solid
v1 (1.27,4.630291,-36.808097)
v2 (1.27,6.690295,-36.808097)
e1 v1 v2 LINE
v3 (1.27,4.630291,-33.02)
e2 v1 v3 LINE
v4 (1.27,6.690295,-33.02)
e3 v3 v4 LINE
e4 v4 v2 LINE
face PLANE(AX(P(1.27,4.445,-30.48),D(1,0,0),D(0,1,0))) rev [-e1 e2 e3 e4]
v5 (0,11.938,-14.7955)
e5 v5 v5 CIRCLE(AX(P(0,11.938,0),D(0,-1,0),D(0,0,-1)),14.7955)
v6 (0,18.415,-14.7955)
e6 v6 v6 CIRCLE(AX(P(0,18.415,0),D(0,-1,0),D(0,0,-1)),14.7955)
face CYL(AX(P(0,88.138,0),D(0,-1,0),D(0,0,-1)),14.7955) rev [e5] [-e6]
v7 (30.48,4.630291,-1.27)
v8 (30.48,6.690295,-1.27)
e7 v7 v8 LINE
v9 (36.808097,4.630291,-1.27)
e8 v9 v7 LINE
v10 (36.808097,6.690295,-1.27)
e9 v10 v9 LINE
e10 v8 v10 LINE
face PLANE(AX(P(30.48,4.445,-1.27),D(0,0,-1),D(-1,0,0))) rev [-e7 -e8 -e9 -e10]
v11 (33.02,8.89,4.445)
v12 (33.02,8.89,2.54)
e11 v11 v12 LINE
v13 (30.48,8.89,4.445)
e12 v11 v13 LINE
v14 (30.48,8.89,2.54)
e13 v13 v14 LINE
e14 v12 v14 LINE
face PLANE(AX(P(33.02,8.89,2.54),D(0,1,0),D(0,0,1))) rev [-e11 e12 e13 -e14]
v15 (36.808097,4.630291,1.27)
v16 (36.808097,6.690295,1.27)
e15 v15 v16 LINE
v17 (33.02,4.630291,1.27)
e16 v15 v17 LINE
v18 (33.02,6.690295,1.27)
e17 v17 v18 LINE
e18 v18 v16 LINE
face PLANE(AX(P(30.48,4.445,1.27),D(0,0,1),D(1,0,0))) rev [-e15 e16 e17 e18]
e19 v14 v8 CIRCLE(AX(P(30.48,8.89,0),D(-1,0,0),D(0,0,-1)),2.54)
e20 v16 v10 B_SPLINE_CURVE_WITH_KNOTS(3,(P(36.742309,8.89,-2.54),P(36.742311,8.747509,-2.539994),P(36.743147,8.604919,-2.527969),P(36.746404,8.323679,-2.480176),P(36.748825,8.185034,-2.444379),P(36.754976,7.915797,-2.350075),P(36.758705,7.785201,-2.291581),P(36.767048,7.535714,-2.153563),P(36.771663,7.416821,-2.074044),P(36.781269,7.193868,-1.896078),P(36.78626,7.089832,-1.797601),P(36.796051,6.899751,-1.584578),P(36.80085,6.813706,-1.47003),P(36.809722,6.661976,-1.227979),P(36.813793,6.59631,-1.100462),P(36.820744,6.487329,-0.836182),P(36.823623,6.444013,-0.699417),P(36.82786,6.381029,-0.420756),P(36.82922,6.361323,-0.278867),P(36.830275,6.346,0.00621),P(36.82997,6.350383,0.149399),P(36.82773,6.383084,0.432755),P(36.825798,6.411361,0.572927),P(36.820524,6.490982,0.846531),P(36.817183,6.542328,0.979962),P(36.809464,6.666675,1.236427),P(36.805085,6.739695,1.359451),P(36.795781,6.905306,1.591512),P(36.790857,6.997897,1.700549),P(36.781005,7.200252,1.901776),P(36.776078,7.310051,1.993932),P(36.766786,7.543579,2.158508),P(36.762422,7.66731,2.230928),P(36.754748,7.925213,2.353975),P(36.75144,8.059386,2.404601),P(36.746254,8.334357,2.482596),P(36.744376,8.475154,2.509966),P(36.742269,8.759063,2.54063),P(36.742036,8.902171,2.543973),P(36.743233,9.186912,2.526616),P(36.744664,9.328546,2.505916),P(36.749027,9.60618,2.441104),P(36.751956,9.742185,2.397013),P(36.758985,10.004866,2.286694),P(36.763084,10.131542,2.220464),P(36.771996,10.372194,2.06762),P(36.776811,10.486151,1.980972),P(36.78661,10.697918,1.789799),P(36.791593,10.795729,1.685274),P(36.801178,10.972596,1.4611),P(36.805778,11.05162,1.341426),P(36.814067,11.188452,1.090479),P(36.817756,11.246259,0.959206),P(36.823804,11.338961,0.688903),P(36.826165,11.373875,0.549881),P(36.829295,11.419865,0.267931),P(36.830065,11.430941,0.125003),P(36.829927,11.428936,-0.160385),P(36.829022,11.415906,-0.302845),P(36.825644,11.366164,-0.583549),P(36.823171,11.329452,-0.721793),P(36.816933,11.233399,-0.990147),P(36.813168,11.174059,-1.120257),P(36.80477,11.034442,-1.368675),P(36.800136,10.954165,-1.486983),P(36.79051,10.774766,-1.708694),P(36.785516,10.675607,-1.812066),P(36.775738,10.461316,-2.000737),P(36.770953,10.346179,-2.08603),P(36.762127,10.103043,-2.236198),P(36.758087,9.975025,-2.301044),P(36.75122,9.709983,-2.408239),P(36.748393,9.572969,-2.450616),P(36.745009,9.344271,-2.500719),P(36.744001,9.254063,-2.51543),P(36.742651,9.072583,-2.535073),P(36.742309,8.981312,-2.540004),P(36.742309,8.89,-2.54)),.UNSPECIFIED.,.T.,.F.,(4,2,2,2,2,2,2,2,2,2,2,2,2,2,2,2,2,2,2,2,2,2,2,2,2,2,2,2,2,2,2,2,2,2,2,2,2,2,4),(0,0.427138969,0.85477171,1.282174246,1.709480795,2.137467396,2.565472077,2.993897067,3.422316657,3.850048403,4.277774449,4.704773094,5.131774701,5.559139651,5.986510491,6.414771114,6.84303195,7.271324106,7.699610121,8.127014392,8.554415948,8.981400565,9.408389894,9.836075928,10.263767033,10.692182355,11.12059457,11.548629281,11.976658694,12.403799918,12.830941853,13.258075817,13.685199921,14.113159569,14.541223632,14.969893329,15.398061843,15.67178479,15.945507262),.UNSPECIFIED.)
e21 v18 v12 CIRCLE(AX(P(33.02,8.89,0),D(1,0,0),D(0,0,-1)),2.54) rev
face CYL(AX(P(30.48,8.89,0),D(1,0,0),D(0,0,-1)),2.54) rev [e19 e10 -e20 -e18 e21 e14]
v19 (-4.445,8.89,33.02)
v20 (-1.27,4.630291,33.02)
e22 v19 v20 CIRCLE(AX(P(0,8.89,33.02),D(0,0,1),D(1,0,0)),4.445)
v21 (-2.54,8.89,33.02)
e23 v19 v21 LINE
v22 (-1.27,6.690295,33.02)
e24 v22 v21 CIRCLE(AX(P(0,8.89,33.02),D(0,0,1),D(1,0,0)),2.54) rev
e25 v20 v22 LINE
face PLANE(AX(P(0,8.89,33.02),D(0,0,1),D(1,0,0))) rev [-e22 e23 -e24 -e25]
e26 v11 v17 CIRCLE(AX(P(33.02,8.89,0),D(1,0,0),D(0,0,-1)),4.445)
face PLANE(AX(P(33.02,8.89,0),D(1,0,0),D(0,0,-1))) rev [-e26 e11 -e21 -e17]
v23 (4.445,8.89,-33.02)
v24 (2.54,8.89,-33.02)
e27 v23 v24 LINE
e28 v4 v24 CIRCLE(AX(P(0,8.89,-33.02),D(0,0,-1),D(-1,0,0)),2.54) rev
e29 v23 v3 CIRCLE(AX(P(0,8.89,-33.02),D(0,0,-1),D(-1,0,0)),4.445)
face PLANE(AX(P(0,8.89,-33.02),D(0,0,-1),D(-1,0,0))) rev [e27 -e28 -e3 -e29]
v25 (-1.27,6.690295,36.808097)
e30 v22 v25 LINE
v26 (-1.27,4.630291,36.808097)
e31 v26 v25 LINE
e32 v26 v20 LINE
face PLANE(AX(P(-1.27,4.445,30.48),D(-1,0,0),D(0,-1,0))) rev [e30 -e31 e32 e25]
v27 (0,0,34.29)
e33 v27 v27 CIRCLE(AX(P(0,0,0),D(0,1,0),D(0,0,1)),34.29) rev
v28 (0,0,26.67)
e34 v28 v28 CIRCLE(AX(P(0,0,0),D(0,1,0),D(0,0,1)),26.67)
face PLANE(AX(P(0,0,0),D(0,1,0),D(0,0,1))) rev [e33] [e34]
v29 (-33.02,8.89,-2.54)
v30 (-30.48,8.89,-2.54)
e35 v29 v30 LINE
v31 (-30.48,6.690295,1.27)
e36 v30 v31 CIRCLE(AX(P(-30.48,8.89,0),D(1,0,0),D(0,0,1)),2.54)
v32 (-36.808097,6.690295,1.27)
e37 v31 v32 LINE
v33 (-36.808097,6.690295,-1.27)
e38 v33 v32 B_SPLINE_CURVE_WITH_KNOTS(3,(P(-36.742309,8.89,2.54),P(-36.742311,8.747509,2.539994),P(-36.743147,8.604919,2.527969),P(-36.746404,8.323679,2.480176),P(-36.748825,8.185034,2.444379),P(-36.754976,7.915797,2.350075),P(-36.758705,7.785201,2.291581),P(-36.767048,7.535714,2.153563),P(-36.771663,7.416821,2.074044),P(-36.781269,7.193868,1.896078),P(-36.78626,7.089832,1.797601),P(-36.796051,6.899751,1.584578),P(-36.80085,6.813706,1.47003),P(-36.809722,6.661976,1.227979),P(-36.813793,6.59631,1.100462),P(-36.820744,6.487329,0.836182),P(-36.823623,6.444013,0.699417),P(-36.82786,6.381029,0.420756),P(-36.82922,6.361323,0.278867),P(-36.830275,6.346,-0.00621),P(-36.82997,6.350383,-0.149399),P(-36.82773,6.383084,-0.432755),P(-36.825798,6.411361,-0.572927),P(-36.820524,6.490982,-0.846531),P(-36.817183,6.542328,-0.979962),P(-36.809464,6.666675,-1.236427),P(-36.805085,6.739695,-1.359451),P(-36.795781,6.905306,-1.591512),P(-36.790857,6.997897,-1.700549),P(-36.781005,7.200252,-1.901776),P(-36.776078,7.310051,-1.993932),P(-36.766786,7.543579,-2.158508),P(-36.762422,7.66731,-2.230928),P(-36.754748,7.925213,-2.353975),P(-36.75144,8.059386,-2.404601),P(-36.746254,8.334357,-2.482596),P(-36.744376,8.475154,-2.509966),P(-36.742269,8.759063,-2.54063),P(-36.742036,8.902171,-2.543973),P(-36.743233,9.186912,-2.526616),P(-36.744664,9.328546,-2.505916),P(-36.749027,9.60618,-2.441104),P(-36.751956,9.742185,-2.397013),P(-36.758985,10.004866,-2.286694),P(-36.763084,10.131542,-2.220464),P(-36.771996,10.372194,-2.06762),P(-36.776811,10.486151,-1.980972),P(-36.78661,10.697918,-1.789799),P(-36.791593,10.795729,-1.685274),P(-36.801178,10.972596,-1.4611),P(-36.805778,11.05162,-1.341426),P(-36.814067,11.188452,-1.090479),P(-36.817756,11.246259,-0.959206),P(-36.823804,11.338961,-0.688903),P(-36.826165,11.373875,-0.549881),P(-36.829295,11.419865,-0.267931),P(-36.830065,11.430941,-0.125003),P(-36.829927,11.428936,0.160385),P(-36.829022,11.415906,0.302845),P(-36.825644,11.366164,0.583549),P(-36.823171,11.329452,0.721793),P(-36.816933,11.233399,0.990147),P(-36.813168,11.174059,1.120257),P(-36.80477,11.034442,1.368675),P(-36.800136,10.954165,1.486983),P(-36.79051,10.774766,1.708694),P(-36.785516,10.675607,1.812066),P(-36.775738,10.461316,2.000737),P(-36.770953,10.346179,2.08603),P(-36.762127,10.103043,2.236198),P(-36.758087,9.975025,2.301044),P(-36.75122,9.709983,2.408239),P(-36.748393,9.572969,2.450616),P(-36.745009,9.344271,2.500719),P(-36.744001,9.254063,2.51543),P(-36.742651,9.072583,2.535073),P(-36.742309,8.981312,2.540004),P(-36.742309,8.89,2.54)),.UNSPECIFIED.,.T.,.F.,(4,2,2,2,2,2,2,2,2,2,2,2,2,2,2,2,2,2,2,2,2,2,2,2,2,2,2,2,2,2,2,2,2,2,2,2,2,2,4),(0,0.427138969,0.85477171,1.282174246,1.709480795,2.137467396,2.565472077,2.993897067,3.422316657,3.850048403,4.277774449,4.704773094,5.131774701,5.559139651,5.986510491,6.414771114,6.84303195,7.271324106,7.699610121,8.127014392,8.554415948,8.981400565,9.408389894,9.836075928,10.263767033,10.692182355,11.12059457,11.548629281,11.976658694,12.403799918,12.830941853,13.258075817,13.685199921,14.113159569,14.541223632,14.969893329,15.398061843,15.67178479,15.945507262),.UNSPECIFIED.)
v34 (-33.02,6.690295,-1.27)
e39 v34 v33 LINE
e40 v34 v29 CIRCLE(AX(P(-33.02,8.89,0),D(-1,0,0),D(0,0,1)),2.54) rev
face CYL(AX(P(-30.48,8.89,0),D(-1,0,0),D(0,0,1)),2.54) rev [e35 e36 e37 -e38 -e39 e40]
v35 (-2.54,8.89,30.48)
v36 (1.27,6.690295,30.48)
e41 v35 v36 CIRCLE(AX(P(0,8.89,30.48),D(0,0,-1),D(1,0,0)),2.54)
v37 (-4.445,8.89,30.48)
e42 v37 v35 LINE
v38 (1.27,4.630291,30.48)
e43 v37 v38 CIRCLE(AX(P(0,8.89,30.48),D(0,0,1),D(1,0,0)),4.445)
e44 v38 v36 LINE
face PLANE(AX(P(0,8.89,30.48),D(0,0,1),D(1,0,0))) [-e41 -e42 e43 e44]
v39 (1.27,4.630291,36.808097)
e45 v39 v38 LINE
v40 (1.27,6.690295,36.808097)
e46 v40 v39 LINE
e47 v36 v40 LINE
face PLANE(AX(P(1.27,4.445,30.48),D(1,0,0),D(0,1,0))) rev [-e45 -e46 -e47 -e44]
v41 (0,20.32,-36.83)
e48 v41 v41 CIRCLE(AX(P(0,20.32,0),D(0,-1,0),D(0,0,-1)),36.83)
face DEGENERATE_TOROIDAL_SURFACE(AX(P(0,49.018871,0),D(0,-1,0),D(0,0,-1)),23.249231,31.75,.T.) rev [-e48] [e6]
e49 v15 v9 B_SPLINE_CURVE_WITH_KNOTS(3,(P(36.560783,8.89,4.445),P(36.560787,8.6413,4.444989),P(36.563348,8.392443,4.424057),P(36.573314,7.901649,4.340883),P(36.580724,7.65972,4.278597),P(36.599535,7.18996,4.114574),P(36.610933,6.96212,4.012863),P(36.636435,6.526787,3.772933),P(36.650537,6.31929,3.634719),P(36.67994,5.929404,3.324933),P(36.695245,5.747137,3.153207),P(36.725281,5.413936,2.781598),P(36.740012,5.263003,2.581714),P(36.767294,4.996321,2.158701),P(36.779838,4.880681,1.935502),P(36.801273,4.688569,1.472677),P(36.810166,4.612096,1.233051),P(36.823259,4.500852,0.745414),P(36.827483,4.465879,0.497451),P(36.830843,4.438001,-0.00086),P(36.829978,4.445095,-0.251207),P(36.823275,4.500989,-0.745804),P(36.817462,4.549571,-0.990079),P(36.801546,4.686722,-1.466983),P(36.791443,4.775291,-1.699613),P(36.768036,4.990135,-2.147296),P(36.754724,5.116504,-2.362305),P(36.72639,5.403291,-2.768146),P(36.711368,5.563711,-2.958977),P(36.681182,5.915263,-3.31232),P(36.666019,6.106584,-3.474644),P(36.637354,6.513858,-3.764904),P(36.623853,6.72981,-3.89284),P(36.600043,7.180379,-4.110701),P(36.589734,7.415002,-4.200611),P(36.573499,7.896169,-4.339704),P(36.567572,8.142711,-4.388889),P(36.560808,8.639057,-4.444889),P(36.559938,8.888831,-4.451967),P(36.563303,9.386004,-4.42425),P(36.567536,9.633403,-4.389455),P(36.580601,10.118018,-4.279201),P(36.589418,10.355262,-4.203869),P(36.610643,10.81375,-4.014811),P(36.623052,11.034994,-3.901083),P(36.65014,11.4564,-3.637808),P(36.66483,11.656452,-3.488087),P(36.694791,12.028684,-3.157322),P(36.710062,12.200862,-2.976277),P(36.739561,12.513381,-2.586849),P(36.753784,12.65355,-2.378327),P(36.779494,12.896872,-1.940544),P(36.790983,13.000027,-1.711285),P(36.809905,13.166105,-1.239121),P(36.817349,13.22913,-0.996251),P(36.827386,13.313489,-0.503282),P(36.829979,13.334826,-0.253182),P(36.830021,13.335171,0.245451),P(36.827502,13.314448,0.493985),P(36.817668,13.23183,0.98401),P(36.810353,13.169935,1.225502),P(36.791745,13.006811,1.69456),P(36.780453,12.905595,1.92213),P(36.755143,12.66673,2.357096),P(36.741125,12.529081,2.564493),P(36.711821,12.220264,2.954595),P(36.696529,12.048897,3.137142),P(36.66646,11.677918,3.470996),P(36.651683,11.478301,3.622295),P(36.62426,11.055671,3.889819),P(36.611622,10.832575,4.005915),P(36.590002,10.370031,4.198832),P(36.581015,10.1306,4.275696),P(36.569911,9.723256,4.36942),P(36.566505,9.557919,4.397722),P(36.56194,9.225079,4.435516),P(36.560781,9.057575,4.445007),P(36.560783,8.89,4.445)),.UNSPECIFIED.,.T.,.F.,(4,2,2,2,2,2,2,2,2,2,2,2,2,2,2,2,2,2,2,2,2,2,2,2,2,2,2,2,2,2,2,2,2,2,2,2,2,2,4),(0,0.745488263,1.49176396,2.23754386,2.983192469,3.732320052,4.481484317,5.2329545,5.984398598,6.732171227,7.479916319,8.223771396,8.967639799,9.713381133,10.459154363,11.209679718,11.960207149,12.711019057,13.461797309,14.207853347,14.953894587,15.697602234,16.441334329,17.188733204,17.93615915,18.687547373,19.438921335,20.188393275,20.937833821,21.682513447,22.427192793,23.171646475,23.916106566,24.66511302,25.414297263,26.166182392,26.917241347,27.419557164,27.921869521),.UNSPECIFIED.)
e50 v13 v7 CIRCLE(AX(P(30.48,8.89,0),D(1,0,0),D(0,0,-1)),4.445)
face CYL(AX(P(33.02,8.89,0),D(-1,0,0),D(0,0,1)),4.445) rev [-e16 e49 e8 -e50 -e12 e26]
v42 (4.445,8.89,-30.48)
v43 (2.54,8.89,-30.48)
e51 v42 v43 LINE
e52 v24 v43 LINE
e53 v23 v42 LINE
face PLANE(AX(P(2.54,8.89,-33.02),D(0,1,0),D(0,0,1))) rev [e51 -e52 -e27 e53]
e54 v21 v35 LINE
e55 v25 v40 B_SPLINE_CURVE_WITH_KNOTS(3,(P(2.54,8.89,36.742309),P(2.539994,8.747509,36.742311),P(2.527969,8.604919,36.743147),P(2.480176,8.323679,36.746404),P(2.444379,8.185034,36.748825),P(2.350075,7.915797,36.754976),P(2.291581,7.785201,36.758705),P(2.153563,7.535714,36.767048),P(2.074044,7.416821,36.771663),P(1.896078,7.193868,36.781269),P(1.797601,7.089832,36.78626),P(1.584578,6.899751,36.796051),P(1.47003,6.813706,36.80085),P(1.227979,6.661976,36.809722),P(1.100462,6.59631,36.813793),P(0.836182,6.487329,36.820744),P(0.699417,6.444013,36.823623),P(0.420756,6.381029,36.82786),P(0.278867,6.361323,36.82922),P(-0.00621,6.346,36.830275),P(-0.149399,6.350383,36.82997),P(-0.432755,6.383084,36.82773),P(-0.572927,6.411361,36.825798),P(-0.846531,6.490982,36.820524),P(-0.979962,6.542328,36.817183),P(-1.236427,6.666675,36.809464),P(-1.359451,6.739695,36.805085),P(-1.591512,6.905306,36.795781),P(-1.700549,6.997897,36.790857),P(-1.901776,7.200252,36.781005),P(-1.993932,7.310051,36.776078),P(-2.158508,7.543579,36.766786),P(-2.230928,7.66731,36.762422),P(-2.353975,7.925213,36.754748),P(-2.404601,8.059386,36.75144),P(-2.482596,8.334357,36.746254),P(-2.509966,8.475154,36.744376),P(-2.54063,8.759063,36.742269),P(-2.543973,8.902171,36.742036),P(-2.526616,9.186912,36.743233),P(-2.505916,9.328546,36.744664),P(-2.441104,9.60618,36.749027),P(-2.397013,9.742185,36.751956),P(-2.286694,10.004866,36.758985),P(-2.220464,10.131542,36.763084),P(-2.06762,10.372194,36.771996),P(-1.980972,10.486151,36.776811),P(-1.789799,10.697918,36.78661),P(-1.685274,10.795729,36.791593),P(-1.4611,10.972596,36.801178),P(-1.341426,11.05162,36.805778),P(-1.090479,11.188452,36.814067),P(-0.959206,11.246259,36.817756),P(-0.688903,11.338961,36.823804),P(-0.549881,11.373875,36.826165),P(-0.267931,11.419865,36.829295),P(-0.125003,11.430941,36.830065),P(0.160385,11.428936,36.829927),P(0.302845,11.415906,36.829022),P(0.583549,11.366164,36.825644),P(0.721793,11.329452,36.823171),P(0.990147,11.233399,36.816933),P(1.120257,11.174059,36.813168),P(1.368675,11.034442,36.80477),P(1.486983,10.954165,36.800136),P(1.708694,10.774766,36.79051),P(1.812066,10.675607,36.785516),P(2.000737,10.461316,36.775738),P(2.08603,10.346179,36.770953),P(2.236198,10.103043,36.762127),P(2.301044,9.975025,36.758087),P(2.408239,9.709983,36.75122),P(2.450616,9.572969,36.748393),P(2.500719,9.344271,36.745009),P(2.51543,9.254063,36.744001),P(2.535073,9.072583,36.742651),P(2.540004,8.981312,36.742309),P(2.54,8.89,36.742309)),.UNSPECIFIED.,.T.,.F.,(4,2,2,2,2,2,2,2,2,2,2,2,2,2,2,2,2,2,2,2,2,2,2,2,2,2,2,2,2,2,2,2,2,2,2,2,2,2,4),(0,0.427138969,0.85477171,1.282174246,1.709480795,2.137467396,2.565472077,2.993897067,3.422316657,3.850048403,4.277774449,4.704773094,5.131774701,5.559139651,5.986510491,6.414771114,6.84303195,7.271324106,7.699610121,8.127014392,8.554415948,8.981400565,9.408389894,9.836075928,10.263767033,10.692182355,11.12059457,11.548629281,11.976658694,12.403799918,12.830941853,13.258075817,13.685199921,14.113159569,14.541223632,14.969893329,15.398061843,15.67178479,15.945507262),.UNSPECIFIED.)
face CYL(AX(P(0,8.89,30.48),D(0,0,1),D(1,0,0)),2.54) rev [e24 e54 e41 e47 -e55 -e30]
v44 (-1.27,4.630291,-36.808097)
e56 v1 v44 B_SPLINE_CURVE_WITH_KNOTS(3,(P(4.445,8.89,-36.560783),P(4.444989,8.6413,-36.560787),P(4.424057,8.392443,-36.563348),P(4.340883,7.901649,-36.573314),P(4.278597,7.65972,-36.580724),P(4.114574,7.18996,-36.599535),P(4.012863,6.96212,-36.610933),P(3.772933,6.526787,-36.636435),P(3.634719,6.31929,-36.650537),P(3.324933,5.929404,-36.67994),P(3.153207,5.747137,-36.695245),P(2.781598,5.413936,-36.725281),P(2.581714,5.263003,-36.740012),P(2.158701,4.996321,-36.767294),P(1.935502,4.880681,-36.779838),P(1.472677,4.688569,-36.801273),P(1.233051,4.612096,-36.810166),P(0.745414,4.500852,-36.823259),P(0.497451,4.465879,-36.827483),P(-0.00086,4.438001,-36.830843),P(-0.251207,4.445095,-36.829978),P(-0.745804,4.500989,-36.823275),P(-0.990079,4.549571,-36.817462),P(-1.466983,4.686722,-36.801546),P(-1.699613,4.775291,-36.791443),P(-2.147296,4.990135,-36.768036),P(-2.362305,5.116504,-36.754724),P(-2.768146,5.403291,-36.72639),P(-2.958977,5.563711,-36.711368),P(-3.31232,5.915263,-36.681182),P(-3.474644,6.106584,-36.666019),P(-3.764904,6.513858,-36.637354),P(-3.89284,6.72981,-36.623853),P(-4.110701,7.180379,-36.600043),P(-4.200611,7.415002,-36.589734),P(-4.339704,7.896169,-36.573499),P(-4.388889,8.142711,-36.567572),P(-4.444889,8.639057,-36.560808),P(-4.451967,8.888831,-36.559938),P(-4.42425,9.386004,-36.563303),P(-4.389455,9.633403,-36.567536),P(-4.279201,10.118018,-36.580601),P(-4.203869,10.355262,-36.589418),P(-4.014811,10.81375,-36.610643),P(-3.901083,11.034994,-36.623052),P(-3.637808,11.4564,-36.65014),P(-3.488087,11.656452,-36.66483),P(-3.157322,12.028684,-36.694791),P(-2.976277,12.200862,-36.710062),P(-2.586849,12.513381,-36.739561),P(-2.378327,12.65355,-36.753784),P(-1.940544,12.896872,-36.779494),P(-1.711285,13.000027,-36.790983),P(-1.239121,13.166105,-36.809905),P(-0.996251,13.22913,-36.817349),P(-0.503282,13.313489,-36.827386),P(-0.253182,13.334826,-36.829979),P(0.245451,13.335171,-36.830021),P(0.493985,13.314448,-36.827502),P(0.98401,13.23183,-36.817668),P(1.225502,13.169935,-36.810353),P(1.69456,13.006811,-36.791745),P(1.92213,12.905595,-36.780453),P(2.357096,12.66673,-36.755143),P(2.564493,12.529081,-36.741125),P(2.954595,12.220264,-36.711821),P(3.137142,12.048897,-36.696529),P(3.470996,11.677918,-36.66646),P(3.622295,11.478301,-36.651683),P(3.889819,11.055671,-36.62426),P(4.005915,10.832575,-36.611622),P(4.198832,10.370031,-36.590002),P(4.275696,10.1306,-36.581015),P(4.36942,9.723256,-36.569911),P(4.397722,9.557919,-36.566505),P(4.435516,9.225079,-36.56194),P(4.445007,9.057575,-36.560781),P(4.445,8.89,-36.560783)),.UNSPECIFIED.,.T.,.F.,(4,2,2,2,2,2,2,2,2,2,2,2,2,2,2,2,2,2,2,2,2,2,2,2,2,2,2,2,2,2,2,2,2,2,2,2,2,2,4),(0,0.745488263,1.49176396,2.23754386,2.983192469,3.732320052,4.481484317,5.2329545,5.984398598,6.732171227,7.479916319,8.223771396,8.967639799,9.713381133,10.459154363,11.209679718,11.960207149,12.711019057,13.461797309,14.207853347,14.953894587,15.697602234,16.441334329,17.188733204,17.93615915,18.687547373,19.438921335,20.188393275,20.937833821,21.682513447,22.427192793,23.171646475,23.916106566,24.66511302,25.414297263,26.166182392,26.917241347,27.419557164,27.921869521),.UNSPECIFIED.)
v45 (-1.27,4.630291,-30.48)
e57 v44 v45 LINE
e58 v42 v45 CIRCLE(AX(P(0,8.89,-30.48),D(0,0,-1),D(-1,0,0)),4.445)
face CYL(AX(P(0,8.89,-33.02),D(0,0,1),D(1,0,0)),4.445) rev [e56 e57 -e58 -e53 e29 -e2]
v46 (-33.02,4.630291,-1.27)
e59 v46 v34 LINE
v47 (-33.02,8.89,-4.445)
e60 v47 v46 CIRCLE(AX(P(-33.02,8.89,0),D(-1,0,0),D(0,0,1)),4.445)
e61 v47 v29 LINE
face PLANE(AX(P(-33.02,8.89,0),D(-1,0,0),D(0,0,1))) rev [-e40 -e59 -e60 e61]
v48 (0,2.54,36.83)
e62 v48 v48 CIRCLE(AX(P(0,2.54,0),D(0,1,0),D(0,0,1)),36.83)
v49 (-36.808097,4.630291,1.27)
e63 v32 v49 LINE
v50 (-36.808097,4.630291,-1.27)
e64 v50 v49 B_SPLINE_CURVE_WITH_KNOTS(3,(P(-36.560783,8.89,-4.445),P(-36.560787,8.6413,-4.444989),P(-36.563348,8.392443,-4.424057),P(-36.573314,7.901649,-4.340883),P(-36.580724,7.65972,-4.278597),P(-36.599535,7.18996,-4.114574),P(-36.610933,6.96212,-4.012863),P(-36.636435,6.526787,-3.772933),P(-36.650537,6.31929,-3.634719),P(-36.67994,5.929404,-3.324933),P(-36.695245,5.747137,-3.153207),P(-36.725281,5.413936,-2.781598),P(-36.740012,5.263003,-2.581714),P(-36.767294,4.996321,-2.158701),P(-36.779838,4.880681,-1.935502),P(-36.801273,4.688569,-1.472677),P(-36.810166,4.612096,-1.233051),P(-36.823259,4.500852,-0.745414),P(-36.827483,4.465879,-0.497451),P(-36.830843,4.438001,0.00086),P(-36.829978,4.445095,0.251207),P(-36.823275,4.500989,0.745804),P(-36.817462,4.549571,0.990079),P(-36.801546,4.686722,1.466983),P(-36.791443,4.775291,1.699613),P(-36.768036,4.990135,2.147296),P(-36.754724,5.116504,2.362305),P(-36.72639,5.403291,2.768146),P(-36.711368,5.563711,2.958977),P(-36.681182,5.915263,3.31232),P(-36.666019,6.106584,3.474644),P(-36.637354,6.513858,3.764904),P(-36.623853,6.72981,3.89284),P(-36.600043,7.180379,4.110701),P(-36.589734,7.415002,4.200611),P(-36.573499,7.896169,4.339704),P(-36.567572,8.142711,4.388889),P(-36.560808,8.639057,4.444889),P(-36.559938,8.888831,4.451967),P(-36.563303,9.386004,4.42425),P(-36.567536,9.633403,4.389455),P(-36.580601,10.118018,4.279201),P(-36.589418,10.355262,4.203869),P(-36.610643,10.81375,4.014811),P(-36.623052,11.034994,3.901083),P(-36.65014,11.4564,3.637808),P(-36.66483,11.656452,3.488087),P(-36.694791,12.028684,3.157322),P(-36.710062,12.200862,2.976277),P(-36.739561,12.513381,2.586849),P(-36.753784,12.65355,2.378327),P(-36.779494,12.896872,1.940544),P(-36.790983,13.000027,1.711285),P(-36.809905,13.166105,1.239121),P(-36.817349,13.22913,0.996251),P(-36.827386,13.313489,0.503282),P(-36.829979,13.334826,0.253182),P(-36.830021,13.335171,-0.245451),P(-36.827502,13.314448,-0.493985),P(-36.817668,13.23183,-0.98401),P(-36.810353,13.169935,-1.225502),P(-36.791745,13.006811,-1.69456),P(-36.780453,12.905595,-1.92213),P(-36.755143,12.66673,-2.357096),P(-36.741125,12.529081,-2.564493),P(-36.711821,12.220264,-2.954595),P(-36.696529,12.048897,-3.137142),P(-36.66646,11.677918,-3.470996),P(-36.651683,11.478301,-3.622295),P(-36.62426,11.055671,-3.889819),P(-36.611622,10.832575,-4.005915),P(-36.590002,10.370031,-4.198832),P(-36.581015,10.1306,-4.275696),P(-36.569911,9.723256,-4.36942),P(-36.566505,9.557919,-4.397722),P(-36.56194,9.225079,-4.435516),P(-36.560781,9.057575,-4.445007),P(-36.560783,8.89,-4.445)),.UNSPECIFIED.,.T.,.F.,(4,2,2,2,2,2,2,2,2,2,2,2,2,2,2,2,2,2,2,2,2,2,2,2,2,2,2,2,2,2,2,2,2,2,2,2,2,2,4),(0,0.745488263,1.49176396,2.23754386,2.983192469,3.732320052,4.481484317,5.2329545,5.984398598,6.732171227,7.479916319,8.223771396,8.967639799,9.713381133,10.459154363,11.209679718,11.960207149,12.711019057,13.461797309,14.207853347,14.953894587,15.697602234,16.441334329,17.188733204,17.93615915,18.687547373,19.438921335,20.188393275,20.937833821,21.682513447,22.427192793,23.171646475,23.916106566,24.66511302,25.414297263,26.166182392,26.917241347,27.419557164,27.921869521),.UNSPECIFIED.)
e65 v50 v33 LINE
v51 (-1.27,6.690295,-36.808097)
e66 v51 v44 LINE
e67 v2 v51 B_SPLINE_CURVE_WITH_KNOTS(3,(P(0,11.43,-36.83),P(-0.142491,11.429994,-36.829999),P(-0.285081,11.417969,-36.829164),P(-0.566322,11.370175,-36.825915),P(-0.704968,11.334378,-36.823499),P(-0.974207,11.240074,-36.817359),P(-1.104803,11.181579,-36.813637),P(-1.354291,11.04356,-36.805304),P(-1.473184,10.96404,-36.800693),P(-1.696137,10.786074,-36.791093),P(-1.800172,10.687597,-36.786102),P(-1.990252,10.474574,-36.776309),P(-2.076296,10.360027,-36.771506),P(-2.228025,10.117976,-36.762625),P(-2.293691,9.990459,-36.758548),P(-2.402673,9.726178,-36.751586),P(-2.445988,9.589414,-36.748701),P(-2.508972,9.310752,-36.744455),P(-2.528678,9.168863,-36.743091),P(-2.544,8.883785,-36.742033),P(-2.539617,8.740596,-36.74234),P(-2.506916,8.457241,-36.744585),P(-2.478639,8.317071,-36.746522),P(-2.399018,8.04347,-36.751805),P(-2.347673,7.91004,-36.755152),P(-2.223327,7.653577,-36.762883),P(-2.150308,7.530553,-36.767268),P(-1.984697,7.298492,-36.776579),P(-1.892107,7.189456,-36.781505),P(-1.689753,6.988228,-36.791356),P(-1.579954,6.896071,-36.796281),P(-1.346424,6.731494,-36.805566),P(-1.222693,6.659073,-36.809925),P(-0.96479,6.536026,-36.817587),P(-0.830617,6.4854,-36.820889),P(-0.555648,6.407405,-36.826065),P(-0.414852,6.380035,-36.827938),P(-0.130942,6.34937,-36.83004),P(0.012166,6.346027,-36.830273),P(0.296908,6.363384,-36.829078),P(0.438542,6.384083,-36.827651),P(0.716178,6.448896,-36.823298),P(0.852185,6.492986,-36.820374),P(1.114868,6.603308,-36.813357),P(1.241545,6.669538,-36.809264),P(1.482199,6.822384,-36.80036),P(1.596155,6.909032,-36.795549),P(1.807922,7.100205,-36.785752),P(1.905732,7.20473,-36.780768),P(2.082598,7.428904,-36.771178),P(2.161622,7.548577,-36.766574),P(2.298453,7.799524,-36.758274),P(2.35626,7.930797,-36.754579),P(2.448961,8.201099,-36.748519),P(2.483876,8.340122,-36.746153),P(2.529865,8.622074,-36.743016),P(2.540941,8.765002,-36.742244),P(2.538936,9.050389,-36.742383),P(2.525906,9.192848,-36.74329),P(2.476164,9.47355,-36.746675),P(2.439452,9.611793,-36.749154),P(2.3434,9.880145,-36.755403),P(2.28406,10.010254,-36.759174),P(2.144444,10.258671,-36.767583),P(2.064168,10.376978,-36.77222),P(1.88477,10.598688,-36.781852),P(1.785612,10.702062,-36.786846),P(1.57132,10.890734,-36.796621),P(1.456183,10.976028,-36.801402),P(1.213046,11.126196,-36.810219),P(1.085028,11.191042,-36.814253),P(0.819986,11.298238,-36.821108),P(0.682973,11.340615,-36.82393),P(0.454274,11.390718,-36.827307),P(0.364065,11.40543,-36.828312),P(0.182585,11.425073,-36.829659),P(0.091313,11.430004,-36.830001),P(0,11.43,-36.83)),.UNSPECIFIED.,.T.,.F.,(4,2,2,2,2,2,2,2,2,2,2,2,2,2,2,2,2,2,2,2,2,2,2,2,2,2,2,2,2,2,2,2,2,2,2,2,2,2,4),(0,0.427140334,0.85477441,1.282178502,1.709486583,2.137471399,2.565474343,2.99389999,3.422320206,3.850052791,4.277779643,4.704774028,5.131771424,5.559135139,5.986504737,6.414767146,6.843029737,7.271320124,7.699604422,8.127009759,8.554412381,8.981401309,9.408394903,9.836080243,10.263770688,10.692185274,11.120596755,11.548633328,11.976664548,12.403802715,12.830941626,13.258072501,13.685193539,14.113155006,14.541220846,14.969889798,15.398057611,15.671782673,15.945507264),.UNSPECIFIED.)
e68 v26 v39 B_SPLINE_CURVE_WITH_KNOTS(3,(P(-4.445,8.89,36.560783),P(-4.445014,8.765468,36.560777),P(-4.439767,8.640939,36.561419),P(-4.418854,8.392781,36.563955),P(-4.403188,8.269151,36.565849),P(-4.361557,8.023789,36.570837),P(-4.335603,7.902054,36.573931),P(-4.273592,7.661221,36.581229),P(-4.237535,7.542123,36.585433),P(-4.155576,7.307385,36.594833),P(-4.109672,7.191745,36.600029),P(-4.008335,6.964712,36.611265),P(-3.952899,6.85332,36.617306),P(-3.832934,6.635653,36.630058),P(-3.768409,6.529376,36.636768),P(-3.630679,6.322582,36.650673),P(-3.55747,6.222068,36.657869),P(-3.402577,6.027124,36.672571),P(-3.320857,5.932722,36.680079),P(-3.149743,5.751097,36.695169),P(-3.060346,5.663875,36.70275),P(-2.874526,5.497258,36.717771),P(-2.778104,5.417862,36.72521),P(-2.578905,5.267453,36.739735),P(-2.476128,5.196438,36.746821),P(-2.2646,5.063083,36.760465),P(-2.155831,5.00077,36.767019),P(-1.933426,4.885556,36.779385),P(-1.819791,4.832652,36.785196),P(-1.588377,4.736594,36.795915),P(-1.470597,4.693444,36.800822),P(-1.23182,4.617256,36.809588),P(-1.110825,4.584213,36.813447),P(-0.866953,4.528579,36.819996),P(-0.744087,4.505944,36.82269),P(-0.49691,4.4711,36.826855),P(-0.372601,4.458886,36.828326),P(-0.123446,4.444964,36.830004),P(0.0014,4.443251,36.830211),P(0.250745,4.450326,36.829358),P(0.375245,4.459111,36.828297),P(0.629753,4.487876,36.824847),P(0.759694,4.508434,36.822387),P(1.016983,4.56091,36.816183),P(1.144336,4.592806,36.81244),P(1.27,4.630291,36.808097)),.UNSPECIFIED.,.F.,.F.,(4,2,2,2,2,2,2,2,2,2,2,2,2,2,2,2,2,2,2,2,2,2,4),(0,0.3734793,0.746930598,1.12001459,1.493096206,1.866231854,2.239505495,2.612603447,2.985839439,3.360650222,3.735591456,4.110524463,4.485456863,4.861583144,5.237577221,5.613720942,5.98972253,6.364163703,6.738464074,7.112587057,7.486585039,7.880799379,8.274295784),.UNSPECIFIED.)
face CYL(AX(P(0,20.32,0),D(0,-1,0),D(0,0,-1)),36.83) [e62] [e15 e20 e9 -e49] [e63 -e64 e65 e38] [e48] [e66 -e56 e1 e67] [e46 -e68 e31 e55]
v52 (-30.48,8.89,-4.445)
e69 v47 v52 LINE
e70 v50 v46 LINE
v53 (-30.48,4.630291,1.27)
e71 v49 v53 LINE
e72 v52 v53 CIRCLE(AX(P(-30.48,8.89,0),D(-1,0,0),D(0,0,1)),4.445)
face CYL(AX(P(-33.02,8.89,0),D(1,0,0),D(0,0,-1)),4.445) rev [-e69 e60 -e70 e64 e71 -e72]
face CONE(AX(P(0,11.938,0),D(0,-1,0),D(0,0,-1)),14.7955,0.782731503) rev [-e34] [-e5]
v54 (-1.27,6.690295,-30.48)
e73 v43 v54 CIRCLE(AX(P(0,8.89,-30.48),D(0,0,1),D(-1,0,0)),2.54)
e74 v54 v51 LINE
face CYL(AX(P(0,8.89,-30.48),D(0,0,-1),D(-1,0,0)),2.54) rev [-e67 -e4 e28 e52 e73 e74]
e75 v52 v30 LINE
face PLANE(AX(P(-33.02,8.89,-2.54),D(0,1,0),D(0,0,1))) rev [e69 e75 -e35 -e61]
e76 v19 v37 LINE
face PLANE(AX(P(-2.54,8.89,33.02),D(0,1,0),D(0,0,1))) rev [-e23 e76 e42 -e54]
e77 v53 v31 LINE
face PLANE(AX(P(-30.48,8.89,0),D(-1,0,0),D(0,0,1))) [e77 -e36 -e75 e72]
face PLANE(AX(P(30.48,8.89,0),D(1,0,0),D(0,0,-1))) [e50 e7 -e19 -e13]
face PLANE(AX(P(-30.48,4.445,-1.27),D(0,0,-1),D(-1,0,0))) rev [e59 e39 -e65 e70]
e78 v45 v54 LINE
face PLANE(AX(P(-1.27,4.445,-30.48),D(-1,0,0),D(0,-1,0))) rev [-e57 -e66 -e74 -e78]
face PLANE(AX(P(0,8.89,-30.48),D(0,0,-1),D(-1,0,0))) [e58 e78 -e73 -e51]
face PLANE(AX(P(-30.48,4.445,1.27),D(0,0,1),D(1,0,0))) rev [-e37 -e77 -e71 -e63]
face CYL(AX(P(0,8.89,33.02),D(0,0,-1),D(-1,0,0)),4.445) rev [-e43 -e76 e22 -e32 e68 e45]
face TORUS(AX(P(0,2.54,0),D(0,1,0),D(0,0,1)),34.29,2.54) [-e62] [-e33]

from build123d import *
from build123d.topology import SkipClean

# Parameters (mm, degrees)
SKETCH1_R           = 36.83
BOSS_EXTRUDE1_DEPTH = 20.32
FILLET1_R           = 2.54
SKETCH2_R           = 26.67
SKETCH3_R           = 14.7955
SKETCH4_R           = 14.7955
CUT_EXTRUDE1_DEPTH  = 76.2
SKETCH8_R           = 2.54
CUT_EXTRUDE2_DEPTH  = 6.35
CIRPATTERN1_COUNT   = 4
CUT_EXTRUDE3_DEPTH  = 6.35
SKETCH10_R          = 4.445
CUT_EXTRUDE4_DEPTH  = 2.54
BOSS_EXTRUDE2_DEPTH = 2.54
BOSS_EXTRUDE3_DEPTH = 6.35
SKETCH13_R          = 39.975148753
SKETCH13_R_2        = 36.83
CUT_EXTRUDE5_DEPTH  = 21.59
CIRPATTERN2_COUNT   = 4


with BuildPart() as part:
    # Sketch1 → Boss-Extrude1 (new body)
    with BuildSketch(Plane(origin=(0, 0, 0), x_dir=(1, 0, 0), z_dir=(0, 1, 0))):
        with Locations(Location((0, 0, 0), (0, 0, 270))):
            Circle(SKETCH1_R)
    extrude(amount=BOSS_EXTRUDE1_DEPTH)

    # Fillet1
    fillet1_edges = [part.edges().sort_by_distance(p)[0] for p in [
        (0, 0, -36.83),
    ]]
    fillet(fillet1_edges, radius=FILLET1_R)

    # Sketch2 → Cut-Loft1 section 0
    with BuildSketch(Plane(origin=(0, 0, 0), x_dir=(1, 0, 0), z_dir=(0, 1, 0))):
        Circle(SKETCH2_R)
    # Sketch3 → Cut-Loft1 section 1
    with BuildSketch(Plane(origin=(0, 11.938, 0), x_dir=(1, 0, 0), z_dir=(0, 1, 0))):
        Circle(SKETCH3_R)
    loft(mode=Mode.SUBTRACT)

    # Sketch4 → Cut-Extrude1 (cut)
    with BuildSketch(Plane.XZ.offset(-11.938)):
        with Locations(Location((0, 0, 0), (0, 0, 270))):
            Circle(SKETCH4_R)
    extrude(amount=-CUT_EXTRUDE1_DEPTH, mode=Mode.SUBTRACT)

    # Sketch8 → Cut-Extrude2 (cut)
    with BuildSketch(Plane.XY.offset(36.83)):
        with Locations((0, 8.89)):
            Circle(SKETCH8_R)
    cut_extrude2 = extrude(amount=-CUT_EXTRUDE2_DEPTH, mode=Mode.SUBTRACT)

    # CirPattern1: Cut-Extrude2 ×4 about axis
    cirpattern1_axis = Axis((0, 0, 0), (0, 1, 0))
    for i in range(1, CIRPATTERN1_COUNT):
        add(cut_extrude2.rotate(cirpattern1_axis, i * 360 / CIRPATTERN1_COUNT), mode=Mode.SUBTRACT)

    # Sketch9 → Cut-Extrude3 (cut)
    with BuildSketch(Plane.XY.offset(36.83)):
        with BuildLine():
            Line((-1.27, 4.445), (1.27, 4.445))
            Line((1.27, 4.445), (1.27, 6.690295474))
            ThreePointArc((1.27, 6.690295474), (0, 6.35), (-1.27, 6.690295474))
            Line((-1.27, 6.690295474), (-1.27, 4.445))
        make_face()
    cut_extrude3 = extrude(amount=-CUT_EXTRUDE3_DEPTH, mode=Mode.SUBTRACT)

    # Sketch10 → Cut-Extrude4 (cut)
    with BuildSketch(Plane.XY.offset(30.48)):
        with Locations((0, 8.89)):
            Circle(SKETCH10_R)
    cut_extrude4 = extrude(amount=CUT_EXTRUDE4_DEPTH, mode=Mode.SUBTRACT)

    # Sketch11 → Boss-Extrude2 (add)
    with BuildSketch(Plane.XY.offset(30.48)):
        with BuildLine():
            Line((-2.54, 8.89), (-4.445, 8.89))
            ThreePointArc((-4.445, 8.89), (2.656395584, 12.453928661), (1.27, 4.630290503))
            Line((1.27, 4.630290503), (1.27, 6.690295474))
            ThreePointArc((1.27, 6.690295474), (1.27, 11.089704526), (-2.54, 8.89))
        make_face()
    boss_extrude2 = extrude(amount=BOSS_EXTRUDE2_DEPTH)

    # Sketch12 → Boss-Extrude3 (add)
    with BuildSketch(Plane.XY.offset(30.48)):
        with BuildLine():
            Line((-1.27, 4.445), (-1.1e-08, 4.445))
            ThreePointArc((-1.1e-08, 4.445), (-0.641722798, 4.491566546), (-1.27, 4.630290503))
            Line((-1.27, 4.630290503), (-1.27, 4.445))
        make_face()
        with BuildLine():
            Line((-1.1e-08, 4.445), (1.27, 4.445))
            Line((1.27, 4.445), (1.27, 4.630290503))
            ThreePointArc((1.27, 4.630290503), (0.641722787, 4.491566544), (-1.1e-08, 4.445))
        make_face()
    boss_extrude3 = extrude(amount=BOSS_EXTRUDE3_DEPTH)

    # Sketch13 → Cut-Extrude5 (cut)
    with BuildSketch(Plane.XZ):
        Circle(SKETCH13_R)
        with Locations(Location((0, 0, 0), (0, 0, 90))):
            Circle(SKETCH13_R_2, mode=Mode.SUBTRACT)
    cut_extrude5 = extrude(amount=-CUT_EXTRUDE5_DEPTH, mode=Mode.SUBTRACT)

    # CirPattern2: Cut-Extrude3, Cut-Extrude4, Boss-Extrude2, Boss-Extrude3, Cut-Extrude5 ×4 about axis
    with SkipClean():  # the faces are left unmerged after this step: merging them gives an invalid solid
        cirpattern2_axis = Axis((0, 0, 0), (0, 1, 0))
        add([cut_extrude3.rotate(cirpattern2_axis, i * 360 / CIRPATTERN2_COUNT) for i in range(1, CIRPATTERN2_COUNT)], mode=Mode.SUBTRACT)
        add([cut_extrude4.rotate(cirpattern2_axis, i * 360 / CIRPATTERN2_COUNT) for i in range(1, CIRPATTERN2_COUNT)], mode=Mode.SUBTRACT)
        add([boss_extrude2.rotate(cirpattern2_axis, i * 360 / CIRPATTERN2_COUNT) for i in range(1, CIRPATTERN2_COUNT)])
        add([boss_extrude3.rotate(cirpattern2_axis, i * 360 / CIRPATTERN2_COUNT) for i in range(1, CIRPATTERN2_COUNT)])
        add([cut_extrude5.rotate(cirpattern2_axis, i * 360 / CIRPATTERN2_COUNT) for i in range(1, CIRPATTERN2_COUNT)], mode=Mode.SUBTRACT)
    add(part.part.scale(1), mode=Mode.REPLACE)  # the faces are merged on a copy

    # Sketch17 → Cut-Revolve1 (revolve, cut)
    with BuildSketch(Plane(origin=(0, 0, 0), x_dir=(0, 0, -1), z_dir=(1, 0, 0))):
        with BuildLine():
            Line((36.83, 20.32), (14.7955, 20.32))
            Line((14.7955, 20.32), (14.7955, 18.415))
            ThreePointArc((14.7955, 18.415), (25.983986176, 17.386868237), (36.83, 20.32))
        make_face()
    revolve(axis=Axis((0, 0, 0), (0, 1, 0)), mode=Mode.SUBTRACT)


solid = part.part
